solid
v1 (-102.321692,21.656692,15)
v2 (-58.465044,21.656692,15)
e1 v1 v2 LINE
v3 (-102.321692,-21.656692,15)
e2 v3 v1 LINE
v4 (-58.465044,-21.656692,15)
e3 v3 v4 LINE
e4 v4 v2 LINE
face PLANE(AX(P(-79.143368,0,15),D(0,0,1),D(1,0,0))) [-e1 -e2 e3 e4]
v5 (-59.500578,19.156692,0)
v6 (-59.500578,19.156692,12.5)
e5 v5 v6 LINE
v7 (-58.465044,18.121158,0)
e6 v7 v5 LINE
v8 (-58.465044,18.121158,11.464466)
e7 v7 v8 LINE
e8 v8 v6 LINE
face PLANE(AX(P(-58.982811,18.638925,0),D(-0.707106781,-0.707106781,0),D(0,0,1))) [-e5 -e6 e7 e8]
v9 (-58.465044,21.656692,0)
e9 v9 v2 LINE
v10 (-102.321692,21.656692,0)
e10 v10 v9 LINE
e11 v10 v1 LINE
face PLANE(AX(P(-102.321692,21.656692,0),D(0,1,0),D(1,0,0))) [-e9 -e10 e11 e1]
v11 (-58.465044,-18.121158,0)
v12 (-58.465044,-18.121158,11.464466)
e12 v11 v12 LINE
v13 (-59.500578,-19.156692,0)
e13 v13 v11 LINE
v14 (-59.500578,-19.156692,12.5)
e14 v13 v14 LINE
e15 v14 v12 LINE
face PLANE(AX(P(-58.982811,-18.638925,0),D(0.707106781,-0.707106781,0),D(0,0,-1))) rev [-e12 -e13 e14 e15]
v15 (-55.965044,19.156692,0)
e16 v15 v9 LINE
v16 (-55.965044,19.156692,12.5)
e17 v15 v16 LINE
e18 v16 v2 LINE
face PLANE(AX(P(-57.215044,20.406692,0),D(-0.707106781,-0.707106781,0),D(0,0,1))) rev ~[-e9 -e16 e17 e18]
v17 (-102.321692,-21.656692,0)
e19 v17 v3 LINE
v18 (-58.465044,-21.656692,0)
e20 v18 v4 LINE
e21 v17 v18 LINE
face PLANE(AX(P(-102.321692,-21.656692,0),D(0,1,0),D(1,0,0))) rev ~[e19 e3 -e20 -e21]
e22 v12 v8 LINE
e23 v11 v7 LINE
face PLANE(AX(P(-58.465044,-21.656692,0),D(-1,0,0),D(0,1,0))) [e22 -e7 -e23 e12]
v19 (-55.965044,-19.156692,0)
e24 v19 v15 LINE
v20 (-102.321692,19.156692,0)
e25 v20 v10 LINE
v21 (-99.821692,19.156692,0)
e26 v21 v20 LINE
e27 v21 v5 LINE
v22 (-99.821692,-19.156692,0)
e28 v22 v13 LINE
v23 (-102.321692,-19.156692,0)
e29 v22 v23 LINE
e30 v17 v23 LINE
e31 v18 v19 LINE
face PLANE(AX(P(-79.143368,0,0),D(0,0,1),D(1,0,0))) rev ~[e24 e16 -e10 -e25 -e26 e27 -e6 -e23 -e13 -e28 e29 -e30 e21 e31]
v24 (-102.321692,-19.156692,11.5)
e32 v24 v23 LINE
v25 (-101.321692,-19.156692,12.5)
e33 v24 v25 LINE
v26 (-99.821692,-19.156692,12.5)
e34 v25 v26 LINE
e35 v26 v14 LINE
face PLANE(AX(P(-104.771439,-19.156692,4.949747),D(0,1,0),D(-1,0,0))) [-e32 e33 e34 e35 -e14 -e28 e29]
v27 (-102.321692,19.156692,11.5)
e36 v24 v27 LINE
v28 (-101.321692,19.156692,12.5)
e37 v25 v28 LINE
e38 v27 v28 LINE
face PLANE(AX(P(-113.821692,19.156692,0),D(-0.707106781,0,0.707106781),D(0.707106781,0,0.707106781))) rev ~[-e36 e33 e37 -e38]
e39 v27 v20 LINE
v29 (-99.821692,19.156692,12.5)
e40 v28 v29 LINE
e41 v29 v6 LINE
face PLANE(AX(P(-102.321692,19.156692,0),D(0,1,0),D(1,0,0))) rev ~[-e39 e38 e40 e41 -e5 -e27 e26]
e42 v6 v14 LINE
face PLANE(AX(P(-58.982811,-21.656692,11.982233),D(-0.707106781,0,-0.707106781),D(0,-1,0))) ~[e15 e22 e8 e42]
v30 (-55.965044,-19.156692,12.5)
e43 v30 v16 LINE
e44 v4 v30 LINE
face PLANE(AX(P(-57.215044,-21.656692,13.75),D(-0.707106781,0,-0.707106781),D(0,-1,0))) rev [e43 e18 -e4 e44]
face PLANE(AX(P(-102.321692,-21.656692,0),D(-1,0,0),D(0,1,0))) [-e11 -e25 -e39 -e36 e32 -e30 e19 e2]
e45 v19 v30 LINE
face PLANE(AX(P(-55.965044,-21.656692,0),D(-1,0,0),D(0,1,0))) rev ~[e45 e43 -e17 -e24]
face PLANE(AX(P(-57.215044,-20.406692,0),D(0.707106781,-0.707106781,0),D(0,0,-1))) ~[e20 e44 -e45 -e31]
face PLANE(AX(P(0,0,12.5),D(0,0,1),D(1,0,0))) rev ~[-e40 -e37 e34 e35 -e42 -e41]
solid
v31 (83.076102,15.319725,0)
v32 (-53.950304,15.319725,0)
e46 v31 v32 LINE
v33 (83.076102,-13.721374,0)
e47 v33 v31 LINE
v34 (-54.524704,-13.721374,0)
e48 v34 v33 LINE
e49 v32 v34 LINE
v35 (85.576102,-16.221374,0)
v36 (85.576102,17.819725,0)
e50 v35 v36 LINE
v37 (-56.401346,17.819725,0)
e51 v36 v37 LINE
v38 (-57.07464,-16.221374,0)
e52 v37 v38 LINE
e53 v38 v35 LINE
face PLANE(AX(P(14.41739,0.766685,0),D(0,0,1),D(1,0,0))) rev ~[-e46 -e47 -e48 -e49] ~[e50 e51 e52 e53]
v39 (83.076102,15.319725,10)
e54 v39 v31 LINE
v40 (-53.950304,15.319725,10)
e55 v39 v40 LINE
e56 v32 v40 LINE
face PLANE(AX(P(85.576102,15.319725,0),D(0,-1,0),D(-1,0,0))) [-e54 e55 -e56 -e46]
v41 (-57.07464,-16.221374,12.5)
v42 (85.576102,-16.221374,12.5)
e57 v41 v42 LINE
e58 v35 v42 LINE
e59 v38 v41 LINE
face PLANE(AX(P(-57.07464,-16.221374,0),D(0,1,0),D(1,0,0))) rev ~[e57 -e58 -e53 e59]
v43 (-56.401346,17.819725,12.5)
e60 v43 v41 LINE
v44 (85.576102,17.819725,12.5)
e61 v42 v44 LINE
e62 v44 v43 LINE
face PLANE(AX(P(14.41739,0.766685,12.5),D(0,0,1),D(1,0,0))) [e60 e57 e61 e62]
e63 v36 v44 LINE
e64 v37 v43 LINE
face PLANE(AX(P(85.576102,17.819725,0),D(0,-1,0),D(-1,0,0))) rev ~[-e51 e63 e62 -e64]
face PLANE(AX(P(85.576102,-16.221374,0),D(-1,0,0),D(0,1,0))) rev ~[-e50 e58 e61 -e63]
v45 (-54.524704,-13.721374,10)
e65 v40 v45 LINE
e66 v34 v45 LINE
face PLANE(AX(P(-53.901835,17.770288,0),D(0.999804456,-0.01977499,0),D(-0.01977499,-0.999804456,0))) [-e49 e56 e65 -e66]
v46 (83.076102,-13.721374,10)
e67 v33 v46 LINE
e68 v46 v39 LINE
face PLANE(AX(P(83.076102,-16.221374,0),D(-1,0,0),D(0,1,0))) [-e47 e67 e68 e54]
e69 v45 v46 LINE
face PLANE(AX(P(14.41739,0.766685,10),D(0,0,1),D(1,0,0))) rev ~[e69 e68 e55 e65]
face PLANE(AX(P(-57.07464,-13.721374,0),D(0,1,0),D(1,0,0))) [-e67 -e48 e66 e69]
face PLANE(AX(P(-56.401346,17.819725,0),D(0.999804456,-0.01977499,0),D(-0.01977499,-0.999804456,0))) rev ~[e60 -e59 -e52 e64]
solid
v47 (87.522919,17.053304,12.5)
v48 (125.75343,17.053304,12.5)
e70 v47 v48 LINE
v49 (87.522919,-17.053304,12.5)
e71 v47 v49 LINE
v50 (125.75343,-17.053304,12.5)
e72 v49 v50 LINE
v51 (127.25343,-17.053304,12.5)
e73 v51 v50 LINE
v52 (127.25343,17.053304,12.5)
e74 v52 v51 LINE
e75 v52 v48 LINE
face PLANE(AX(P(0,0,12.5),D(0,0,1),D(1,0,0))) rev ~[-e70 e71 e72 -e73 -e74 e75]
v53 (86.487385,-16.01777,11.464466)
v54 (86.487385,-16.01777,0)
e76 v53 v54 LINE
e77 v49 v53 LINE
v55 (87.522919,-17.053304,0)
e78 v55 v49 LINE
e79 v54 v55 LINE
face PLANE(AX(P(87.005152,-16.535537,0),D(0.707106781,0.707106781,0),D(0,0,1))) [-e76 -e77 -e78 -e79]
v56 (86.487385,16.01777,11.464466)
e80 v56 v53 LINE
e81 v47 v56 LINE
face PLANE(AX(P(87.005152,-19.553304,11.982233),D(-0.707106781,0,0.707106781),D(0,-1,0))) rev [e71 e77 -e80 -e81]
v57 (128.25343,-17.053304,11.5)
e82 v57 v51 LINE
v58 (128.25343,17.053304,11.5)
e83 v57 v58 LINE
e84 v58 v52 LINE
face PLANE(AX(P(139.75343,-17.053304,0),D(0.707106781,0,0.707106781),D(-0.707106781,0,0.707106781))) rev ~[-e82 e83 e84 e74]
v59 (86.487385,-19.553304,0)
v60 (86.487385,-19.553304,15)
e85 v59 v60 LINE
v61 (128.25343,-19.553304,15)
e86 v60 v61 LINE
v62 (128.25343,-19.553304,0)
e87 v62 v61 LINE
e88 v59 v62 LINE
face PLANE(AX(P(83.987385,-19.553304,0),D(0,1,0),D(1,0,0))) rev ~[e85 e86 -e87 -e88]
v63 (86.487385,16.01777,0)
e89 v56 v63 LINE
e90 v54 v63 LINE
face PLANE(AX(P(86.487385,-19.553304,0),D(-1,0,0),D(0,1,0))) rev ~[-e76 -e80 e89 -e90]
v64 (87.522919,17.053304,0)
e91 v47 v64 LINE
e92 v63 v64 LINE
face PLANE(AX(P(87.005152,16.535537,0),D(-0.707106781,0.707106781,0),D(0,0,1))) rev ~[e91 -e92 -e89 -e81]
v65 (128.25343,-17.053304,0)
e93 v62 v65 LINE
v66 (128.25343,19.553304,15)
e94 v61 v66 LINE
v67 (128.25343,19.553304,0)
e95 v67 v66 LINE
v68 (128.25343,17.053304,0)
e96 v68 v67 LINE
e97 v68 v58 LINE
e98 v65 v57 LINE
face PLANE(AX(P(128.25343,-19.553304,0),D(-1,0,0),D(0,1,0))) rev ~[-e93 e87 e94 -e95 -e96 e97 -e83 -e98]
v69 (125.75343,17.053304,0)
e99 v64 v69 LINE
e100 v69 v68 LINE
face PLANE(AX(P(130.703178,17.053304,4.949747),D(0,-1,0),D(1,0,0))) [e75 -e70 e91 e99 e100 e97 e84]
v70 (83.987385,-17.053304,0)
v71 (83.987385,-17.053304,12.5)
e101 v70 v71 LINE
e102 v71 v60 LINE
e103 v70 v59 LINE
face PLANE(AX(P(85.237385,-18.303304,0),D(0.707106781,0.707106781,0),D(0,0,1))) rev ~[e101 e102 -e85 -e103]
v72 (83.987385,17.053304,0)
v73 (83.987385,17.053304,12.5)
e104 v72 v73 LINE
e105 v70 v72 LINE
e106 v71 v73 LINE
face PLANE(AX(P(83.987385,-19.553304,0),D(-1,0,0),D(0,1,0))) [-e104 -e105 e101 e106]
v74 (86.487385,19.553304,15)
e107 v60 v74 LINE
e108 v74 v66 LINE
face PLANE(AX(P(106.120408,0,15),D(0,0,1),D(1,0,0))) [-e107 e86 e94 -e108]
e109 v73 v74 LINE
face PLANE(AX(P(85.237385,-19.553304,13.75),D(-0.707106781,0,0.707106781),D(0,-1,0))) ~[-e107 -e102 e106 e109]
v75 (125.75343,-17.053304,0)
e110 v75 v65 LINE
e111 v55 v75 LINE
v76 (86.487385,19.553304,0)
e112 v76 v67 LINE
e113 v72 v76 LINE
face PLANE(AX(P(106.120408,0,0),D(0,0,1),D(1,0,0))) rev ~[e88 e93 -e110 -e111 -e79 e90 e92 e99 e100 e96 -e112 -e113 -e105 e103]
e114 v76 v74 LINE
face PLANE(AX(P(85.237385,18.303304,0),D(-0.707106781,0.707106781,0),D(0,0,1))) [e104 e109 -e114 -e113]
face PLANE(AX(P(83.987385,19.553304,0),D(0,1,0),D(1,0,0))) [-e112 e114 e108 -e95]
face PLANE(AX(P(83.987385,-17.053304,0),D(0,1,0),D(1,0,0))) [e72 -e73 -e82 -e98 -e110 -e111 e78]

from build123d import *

# Parameters (mm, degrees)
F9_W         = 46.3566482067
F9_H         = 43.3133840561
F10_DEPTH    = 15
F0_W         = 44.2660450935
F0_H         = 39.1066074371
F1_SIZE      = 2.5
F2_SIZE      = 2.5
F3_DEPTH     = 12.5
F4_T         = -2.5
F4_2_T       = -2.5
F4_3_T       = -2.5
F8_T4_DEPTH  = 34.1066074371
F13_T4_DEPTH = 38.3133840561


# Not quite as in the source:
# - a fillet or chamfer that OpenCascade refuses, or shapes differently, is made with other operations: its cross-section is extruded or revolved along the edge and cut away or added
# - the program builds the solid bodies; features that only make, move or delete a surface that nothing else refers to are left out


with BuildPart() as f10:
    # F9 (on Top) → F10 (new body)
    with BuildSketch(Plane.XY):
        with Locations((-79.1433677077, 0)):
            Rectangle(F9_W, F9_H)
    extrude(amount=F10_DEPTH)

    # F2
    f2_edges = [f10.edges().sort_by_distance(p)[0] for p in [
        (-55.965044, -21.656692, 7.5),
        (-55.965044, 0, 15),
        (-55.965044, 21.656692, 7.5),
    ]]
    chamfer(f2_edges, length=F2_SIZE)

    # F4#2
    f4_2_openings = [f10.faces().sort_by_distance(p)[0] for p in [
        (-79.21314, 0, 0),
    ]]
    offset(amount=F4_2_T, openings=f4_2_openings)

    # F13: chamfer of 14 on 1 edges, made by hand


with BuildPart() as f10b:
    # F0 (on Top) → F10, piece 2 (new body)
    with BuildSketch(Plane.XY):
        with Locations((106.1204075813, 0)):
            Rectangle(F0_W, F0_H)
    extrude(amount=F10_DEPTH)

    # F1
    f1_edges = [f10b.edges().sort_by_distance(p)[0] for p in [
        (83.987385, 19.553304, 7.5),
        (83.987385, -19.553304, 7.5),
        (83.987385, 0, 15),
    ]]
    chamfer(f1_edges, length=F1_SIZE)

    # F4#3
    f4_3_openings = [f10b.faces().sort_by_distance(p)[0] for p in [
        (106.197587, 0, 0),
    ]]
    offset(amount=F4_3_T, openings=f4_3_openings)

    # F8: chamfer of 14 on 1 edges, made by hand


with BuildPart() as f3:
    # F11 (on Top) → F3 (new body)
    with BuildSketch(Plane.XY):
        Polygon((85.5761021376, 17.819724977), (-56.4013458788, 17.819724977), (-57.0746399462, -16.2213742733), (85.5761021376, -16.2213742733), align=None)
    extrude(amount=F3_DEPTH)

    # F4
    f4_openings = [f3.faces().sort_by_distance(p)[0] for p in [
        (14.418922, 0.785755, 0),
    ]]
    offset(amount=F4_T, openings=f4_openings)


with BuildPart() as f8_tool2:
    # F8_s3 → F8_t4 (new body)
    with BuildSketch(Plane.XZ.offset(17.0533037186)):
        Polygon((139.7534301281, 0), (125.7534301281, 14), (125.7534301281, 0), align=None)
    extrude(amount=-F8_T4_DEPTH)

    split(bisect_by=Plane.XY.offset(12.5), keep=Keep.BOTTOM)


with BuildPart() as f10b_1:
    add(f10b.part)

    # F8_t1: cut F8_tool2
    add(f8_tool2.part, mode=Mode.SUBTRACT)


with BuildPart() as f13_tool2:
    # F13_s3 → F13_t4 (new body)
    with BuildSketch(Plane.XZ.offset(-19.156692028)):
        Polygon((-113.8216918111, 0), (-99.8216918111, 14), (-99.8216918111, 0), align=None)
    extrude(amount=F13_T4_DEPTH)

    split(bisect_by=Plane.XY.offset(12.5), keep=Keep.BOTTOM)


with BuildPart() as f10_1:
    add(f10.part)

    # F13_t1: cut F13_tool2
    add(f13_tool2.part, mode=Mode.SUBTRACT)


solid = Compound([f3.part, f10b_1.part, f10_1.part])
